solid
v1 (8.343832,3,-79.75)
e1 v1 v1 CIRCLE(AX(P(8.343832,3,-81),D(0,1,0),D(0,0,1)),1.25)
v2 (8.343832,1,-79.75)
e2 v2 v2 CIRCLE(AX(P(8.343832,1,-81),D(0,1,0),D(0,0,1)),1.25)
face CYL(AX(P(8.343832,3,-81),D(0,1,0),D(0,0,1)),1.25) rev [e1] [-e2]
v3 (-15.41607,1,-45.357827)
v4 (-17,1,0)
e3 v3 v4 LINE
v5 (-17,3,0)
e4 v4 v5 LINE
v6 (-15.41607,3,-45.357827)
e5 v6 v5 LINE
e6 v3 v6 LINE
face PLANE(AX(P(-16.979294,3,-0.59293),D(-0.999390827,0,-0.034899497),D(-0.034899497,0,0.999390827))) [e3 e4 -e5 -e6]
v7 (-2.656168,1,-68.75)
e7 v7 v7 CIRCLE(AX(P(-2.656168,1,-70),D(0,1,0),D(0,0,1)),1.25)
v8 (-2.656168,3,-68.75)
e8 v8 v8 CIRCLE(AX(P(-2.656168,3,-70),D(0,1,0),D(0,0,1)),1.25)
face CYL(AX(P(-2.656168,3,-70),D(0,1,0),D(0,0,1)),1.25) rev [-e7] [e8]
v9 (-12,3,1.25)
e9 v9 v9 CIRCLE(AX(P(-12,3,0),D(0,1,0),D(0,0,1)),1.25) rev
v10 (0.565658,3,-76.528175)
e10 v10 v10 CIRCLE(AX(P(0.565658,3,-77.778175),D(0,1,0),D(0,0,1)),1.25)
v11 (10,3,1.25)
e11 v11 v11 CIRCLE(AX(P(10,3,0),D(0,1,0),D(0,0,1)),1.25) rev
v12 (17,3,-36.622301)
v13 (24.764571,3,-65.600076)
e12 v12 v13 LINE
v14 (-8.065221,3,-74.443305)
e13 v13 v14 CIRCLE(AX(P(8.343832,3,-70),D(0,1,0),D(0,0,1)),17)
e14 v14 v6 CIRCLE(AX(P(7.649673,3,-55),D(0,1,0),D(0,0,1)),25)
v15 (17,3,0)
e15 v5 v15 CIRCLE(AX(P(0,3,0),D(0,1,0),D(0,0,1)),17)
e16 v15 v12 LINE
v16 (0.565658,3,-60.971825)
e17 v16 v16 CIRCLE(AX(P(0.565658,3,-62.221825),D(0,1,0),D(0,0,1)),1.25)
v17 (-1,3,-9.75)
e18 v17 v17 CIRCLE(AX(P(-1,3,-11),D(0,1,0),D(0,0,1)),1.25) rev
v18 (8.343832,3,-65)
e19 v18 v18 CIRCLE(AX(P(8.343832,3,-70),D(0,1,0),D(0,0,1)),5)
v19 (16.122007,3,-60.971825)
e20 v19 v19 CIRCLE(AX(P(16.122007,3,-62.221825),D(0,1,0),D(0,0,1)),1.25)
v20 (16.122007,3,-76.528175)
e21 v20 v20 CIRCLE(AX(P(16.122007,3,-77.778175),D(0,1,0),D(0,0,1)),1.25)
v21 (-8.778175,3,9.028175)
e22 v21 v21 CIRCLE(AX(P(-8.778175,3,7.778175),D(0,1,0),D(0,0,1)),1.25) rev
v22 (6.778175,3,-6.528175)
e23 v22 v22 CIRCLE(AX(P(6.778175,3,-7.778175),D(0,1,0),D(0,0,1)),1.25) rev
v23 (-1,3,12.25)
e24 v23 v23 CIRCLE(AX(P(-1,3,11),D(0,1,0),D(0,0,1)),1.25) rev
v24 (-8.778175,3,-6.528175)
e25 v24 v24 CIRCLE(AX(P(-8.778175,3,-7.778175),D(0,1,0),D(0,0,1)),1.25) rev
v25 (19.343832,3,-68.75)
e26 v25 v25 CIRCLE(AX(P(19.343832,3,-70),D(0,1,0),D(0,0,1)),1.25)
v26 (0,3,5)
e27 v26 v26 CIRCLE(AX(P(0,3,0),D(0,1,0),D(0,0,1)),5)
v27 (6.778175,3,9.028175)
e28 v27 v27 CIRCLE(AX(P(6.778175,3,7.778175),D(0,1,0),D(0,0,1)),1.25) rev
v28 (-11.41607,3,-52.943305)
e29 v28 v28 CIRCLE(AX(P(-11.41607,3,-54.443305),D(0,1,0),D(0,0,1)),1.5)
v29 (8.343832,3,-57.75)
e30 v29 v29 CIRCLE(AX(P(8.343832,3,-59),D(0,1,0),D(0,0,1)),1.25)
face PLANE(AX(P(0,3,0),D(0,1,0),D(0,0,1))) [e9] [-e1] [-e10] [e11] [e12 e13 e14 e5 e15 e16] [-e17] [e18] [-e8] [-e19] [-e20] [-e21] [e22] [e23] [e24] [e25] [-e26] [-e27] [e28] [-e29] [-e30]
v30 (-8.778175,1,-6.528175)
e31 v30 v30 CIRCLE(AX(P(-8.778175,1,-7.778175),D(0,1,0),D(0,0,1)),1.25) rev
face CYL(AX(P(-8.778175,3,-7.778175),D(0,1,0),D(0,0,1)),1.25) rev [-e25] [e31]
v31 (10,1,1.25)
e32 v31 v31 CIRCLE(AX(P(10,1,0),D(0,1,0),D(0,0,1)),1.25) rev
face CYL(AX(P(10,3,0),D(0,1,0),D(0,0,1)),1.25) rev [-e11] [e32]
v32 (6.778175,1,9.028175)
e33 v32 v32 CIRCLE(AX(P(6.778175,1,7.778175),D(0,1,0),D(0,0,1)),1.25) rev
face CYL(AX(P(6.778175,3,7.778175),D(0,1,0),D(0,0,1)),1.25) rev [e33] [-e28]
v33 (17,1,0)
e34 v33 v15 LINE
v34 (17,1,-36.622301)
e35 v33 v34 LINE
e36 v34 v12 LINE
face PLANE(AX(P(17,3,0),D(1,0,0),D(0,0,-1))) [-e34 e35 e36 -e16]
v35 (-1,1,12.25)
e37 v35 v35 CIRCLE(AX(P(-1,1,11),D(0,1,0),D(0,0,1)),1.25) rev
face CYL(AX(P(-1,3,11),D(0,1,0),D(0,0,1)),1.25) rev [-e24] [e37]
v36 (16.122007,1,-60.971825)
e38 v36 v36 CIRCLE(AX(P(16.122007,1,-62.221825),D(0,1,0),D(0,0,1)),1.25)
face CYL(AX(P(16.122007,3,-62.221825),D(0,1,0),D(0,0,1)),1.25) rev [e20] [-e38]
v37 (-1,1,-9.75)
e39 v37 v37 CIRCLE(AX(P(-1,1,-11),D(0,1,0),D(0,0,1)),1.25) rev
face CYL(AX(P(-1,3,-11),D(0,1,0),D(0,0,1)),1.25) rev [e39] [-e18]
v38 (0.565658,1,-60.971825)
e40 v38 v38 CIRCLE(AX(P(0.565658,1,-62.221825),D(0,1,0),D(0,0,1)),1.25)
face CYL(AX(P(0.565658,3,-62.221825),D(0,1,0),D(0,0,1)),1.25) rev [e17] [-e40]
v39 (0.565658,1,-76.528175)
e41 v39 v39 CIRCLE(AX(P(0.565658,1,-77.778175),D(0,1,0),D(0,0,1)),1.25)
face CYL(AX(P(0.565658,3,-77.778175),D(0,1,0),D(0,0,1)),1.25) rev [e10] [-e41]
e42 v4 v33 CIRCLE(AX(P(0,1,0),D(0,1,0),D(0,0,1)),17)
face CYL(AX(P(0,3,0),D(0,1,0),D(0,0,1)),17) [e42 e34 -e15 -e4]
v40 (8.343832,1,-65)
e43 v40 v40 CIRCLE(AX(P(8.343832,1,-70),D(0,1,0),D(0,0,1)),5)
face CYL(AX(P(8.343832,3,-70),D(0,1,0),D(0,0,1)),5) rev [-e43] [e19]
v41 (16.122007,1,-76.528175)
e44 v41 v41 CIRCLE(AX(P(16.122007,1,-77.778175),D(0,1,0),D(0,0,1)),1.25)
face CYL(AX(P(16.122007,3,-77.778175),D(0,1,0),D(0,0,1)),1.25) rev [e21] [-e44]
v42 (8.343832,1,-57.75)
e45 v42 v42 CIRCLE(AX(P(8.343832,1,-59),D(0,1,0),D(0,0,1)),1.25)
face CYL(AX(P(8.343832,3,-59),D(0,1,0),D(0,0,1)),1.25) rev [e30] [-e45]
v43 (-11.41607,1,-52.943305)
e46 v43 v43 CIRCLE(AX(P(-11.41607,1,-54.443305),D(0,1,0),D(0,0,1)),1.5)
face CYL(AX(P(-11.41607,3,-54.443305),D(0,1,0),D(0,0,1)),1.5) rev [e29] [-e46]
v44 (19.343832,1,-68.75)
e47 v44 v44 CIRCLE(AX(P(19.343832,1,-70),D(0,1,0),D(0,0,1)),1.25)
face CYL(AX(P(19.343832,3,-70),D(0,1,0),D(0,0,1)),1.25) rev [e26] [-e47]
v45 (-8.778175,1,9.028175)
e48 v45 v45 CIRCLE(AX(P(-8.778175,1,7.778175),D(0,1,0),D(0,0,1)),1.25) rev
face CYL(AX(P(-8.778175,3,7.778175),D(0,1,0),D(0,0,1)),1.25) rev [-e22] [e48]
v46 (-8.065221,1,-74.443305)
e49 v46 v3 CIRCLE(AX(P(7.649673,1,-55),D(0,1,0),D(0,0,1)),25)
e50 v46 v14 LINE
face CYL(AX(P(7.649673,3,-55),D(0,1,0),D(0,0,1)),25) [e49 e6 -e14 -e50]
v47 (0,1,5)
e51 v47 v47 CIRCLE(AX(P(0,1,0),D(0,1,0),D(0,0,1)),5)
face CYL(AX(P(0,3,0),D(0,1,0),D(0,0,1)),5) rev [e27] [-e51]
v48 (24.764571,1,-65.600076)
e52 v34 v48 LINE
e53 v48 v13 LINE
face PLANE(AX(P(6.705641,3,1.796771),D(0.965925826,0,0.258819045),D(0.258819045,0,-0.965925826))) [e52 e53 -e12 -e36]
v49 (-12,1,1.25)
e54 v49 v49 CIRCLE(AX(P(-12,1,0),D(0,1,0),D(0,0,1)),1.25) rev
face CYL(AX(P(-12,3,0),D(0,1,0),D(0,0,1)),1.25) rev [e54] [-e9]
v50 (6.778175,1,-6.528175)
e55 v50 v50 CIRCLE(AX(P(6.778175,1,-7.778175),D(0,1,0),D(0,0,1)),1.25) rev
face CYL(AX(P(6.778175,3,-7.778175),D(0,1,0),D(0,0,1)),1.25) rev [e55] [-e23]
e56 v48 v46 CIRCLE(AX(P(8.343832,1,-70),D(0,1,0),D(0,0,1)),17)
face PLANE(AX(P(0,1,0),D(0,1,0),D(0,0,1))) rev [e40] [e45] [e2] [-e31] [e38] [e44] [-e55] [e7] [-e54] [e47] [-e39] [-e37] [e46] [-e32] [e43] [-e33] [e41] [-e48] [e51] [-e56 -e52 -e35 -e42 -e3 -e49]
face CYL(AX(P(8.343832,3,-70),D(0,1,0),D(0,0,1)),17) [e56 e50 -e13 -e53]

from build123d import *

# Parameters (mm, degrees)
RESSALTO_EXTRUS_O1_DEPTH      = 3
CORTE_EXTRUS_O8_REACH         = 92.666
ESBO_O7_R                     = 1.25
CORTE_EXTRUS_O9_REACH         = 92.666
ESBO_O8_R                     = 5
ESBO_O8_R_2                   = 1.5
CORTE_EXTRUS_O11_REACH        = 92.666
ESBO_O9_R                     = 1.25
CORTE_EXTRUS_O12_REACH        = 92.666
ESBO_O11_R                    = 5
CONVERTER_S_LIDO1_OUTLINE_R   = 1.25
CONVERTER_S_LIDO1_OUTLINE_R_2 = 5
CONVERTER_S_LIDO1_OUTLINE_R_3 = 1.5
CONVERTER_S_LIDO1_DEPTH       = 1


# Read off the part's stored shape, not the designer's step: Converter-Sólido1
with BuildPart() as part:
    # Esboço1 → Ressalto-extrusão1 (new body)
    with BuildSketch(Plane(origin=(0, 0, 0), x_dir=(1, 0, 0), z_dir=(0, 1, 0))):
        with BuildLine():
            Line((17, 36.622301445), (24.764571353, 65.600076233))
            ThreePointArc((24.764571353, 65.600076233), (12.765450327, 86.414910724), (-8.065221434, 74.443304555))
            ThreePointArc((-8.065221434, 74.443304555), (-16.588225274, 61.125706966), (-15.416069793, 45.357826591))
            Line((-15.416069793, 45.357826591), (-17, 0))
            ThreePointArc((-17, 0), (0, -17), (17, 0))
            Line((17, 0), (17, 36.622301445))
        make_face()
    extrude(amount=RESSALTO_EXTRUS_O1_DEPTH)

    # Esboço7 → Corte-extrusão8 (cut, up to next)
    with BuildSketch(Plane.XZ, mode=Mode.PRIVATE) as corte_extrus_o8_sk1:
        with Locations(Location((-1, -11, 0), (0, 0, 270))):
            Circle(ESBO_O7_R)
    corte_extrus_o8_tool1 = extrude(corte_extrus_o8_sk1.sketch, amount=-CORTE_EXTRUS_O8_REACH, mode=Mode.PRIVATE) & part.part
    # Esboço7 → Corte-extrusão8 (cut, up to next)
    with BuildSketch(Plane.XZ, mode=Mode.PRIVATE) as corte_extrus_o8_sk2:
        with Locations(Location((-8.778174593, -7.778174593, 0), (0, 0, 270))):
            Circle(ESBO_O7_R)
    corte_extrus_o8_tool2 = extrude(corte_extrus_o8_sk2.sketch, amount=-CORTE_EXTRUS_O8_REACH, mode=Mode.PRIVATE) & part.part
    # Esboço7 → Corte-extrusão8 (cut, up to next)
    with BuildSketch(Plane.XZ, mode=Mode.PRIVATE) as corte_extrus_o8_sk3:
        with Locations(Location((-12, 0, 0), (0, 0, 270))):
            Circle(ESBO_O7_R)
    corte_extrus_o8_tool3 = extrude(corte_extrus_o8_sk3.sketch, amount=-CORTE_EXTRUS_O8_REACH, mode=Mode.PRIVATE) & part.part
    # Esboço7 → Corte-extrusão8 (cut, up to next)
    with BuildSketch(Plane.XZ, mode=Mode.PRIVATE) as corte_extrus_o8_sk4:
        with Locations(Location((-8.778174593, 7.778174593, 0), (0, 0, 270))):
            Circle(ESBO_O7_R)
    corte_extrus_o8_tool4 = extrude(corte_extrus_o8_sk4.sketch, amount=-CORTE_EXTRUS_O8_REACH, mode=Mode.PRIVATE) & part.part
    # Esboço7 → Corte-extrusão8 (cut, up to next)
    with BuildSketch(Plane.XZ, mode=Mode.PRIVATE) as corte_extrus_o8_sk5:
        with Locations(Location((-1, 11, 0), (0, 0, 270))):
            Circle(ESBO_O7_R)
    corte_extrus_o8_tool5 = extrude(corte_extrus_o8_sk5.sketch, amount=-CORTE_EXTRUS_O8_REACH, mode=Mode.PRIVATE) & part.part
    # Esboço7 → Corte-extrusão8 (cut, up to next)
    with BuildSketch(Plane.XZ, mode=Mode.PRIVATE) as corte_extrus_o8_sk6:
        with Locations(Location((6.778174593, 7.778174593, 0), (0, 0, 270))):
            Circle(ESBO_O7_R)
    corte_extrus_o8_tool6 = extrude(corte_extrus_o8_sk6.sketch, amount=-CORTE_EXTRUS_O8_REACH, mode=Mode.PRIVATE) & part.part
    # Esboço7 → Corte-extrusão8 (cut, up to next)
    with BuildSketch(Plane.XZ, mode=Mode.PRIVATE) as corte_extrus_o8_sk7:
        with Locations(Location((10, 0, 0), (0, 0, 270))):
            Circle(ESBO_O7_R)
    corte_extrus_o8_tool7 = extrude(corte_extrus_o8_sk7.sketch, amount=-CORTE_EXTRUS_O8_REACH, mode=Mode.PRIVATE) & part.part
    # Esboço7 → Corte-extrusão8 (cut, up to next)
    with BuildSketch(Plane.XZ, mode=Mode.PRIVATE) as corte_extrus_o8_sk8:
        with Locations(Location((6.778174593, -7.778174593, 0), (0, 0, 270))):
            Circle(ESBO_O7_R)
    corte_extrus_o8_tool8 = extrude(corte_extrus_o8_sk8.sketch, amount=-CORTE_EXTRUS_O8_REACH, mode=Mode.PRIVATE) & part.part
    add(corte_extrus_o8_tool1.solids().sort_by_distance((-1, 0, -11))[0], mode=Mode.SUBTRACT)
    add(corte_extrus_o8_tool2.solids().sort_by_distance((-8.778175, 0, -7.778175))[0], mode=Mode.SUBTRACT)
    add(corte_extrus_o8_tool3.solids().sort_by_distance((-12, 0, 0))[0], mode=Mode.SUBTRACT)
    add(corte_extrus_o8_tool4.solids().sort_by_distance((-8.778175, 0, 7.778175))[0], mode=Mode.SUBTRACT)
    add(corte_extrus_o8_tool5.solids().sort_by_distance((-1, 0, 11))[0], mode=Mode.SUBTRACT)
    add(corte_extrus_o8_tool6.solids().sort_by_distance((6.778175, 0, 7.778175))[0], mode=Mode.SUBTRACT)
    add(corte_extrus_o8_tool7.solids().sort_by_distance((10, 0, 0))[0], mode=Mode.SUBTRACT)
    add(corte_extrus_o8_tool8.solids().sort_by_distance((6.778175, 0, -7.778175))[0], mode=Mode.SUBTRACT)

    # Esboço8 → Corte-extrusão9 (cut, up to next)
    with BuildSketch(Plane(origin=(0, 3, 0), x_dir=(1, 0, 0), z_dir=(0, 1, 0)), mode=Mode.PRIVATE) as corte_extrus_o9_sk1:
        with Locations(Location((0, 0, 0), (0, 0, 270))):
            Circle(ESBO_O8_R)
    corte_extrus_o9_tool1 = extrude(corte_extrus_o9_sk1.sketch, amount=-CORTE_EXTRUS_O9_REACH, mode=Mode.PRIVATE) & part.part
    # Esboço8 → Corte-extrusão9 (cut, up to next)
    with BuildSketch(Plane(origin=(0, 3, 0), x_dir=(1, 0, 0), z_dir=(0, 1, 0)), mode=Mode.PRIVATE) as corte_extrus_o9_sk2:
        with Locations(Location((-11.416069793, 54.443304555, 0), (0, 0, 270))):
            Circle(ESBO_O8_R_2)
    corte_extrus_o9_tool2 = extrude(corte_extrus_o9_sk2.sketch, amount=-CORTE_EXTRUS_O9_REACH, mode=Mode.PRIVATE) & part.part
    add(corte_extrus_o9_tool1.solids().sort_by_distance((0, 3, 0))[0], mode=Mode.SUBTRACT)
    add(corte_extrus_o9_tool2.solids().sort_by_distance((-11.41607, 3, -54.443305))[0], mode=Mode.SUBTRACT)

    # Esboço9 → Corte-extrusão11 (cut, up to next)
    with BuildSketch(Plane(origin=(0, 3, 0), x_dir=(1, 0, 0), z_dir=(0, 1, 0)), mode=Mode.PRIVATE) as corte_extrus_o11_sk1:
        with Locations(Location((8.343832306, 81, 0), (0, 0, 270))):
            Circle(ESBO_O9_R)
    corte_extrus_o11_tool1 = extrude(corte_extrus_o11_sk1.sketch, amount=-CORTE_EXTRUS_O11_REACH, mode=Mode.PRIVATE) & part.part
    # Esboço9 → Corte-extrusão11 (cut, up to next)
    with BuildSketch(Plane(origin=(0, 3, 0), x_dir=(1, 0, 0), z_dir=(0, 1, 0)), mode=Mode.PRIVATE) as corte_extrus_o11_sk2:
        with Locations(Location((16.122006899, 77.778174593, 0), (0, 0, 270))):
            Circle(ESBO_O9_R)
    corte_extrus_o11_tool2 = extrude(corte_extrus_o11_sk2.sketch, amount=-CORTE_EXTRUS_O11_REACH, mode=Mode.PRIVATE) & part.part
    # Esboço9 → Corte-extrusão11 (cut, up to next)
    with BuildSketch(Plane(origin=(0, 3, 0), x_dir=(1, 0, 0), z_dir=(0, 1, 0)), mode=Mode.PRIVATE) as corte_extrus_o11_sk3:
        with Locations(Location((19.343832306, 70, 0), (0, 0, 270))):
            Circle(ESBO_O9_R)
    corte_extrus_o11_tool3 = extrude(corte_extrus_o11_sk3.sketch, amount=-CORTE_EXTRUS_O11_REACH, mode=Mode.PRIVATE) & part.part
    # Esboço9 → Corte-extrusão11 (cut, up to next)
    with BuildSketch(Plane(origin=(0, 3, 0), x_dir=(1, 0, 0), z_dir=(0, 1, 0)), mode=Mode.PRIVATE) as corte_extrus_o11_sk4:
        with Locations(Location((16.122006899, 62.221825407, 0), (0, 0, 270))):
            Circle(ESBO_O9_R)
    corte_extrus_o11_tool4 = extrude(corte_extrus_o11_sk4.sketch, amount=-CORTE_EXTRUS_O11_REACH, mode=Mode.PRIVATE) & part.part
    # Esboço9 → Corte-extrusão11 (cut, up to next)
    with BuildSketch(Plane(origin=(0, 3, 0), x_dir=(1, 0, 0), z_dir=(0, 1, 0)), mode=Mode.PRIVATE) as corte_extrus_o11_sk5:
        with Locations(Location((8.343832306, 59, 0), (0, 0, 270))):
            Circle(ESBO_O9_R)
    corte_extrus_o11_tool5 = extrude(corte_extrus_o11_sk5.sketch, amount=-CORTE_EXTRUS_O11_REACH, mode=Mode.PRIVATE) & part.part
    # Esboço9 → Corte-extrusão11 (cut, up to next)
    with BuildSketch(Plane(origin=(0, 3, 0), x_dir=(1, 0, 0), z_dir=(0, 1, 0)), mode=Mode.PRIVATE) as corte_extrus_o11_sk6:
        with Locations(Location((0.565657713, 62.221825407, 0), (0, 0, 270))):
            Circle(ESBO_O9_R)
    corte_extrus_o11_tool6 = extrude(corte_extrus_o11_sk6.sketch, amount=-CORTE_EXTRUS_O11_REACH, mode=Mode.PRIVATE) & part.part
    # Esboço9 → Corte-extrusão11 (cut, up to next)
    with BuildSketch(Plane(origin=(0, 3, 0), x_dir=(1, 0, 0), z_dir=(0, 1, 0)), mode=Mode.PRIVATE) as corte_extrus_o11_sk7:
        with Locations(Location((-2.656167694, 70, 0), (0, 0, 270))):
            Circle(ESBO_O9_R)
    corte_extrus_o11_tool7 = extrude(corte_extrus_o11_sk7.sketch, amount=-CORTE_EXTRUS_O11_REACH, mode=Mode.PRIVATE) & part.part
    # Esboço9 → Corte-extrusão11 (cut, up to next)
    with BuildSketch(Plane(origin=(0, 3, 0), x_dir=(1, 0, 0), z_dir=(0, 1, 0)), mode=Mode.PRIVATE) as corte_extrus_o11_sk8:
        with Locations(Location((0.565657713, 77.778174593, 0), (0, 0, 270))):
            Circle(ESBO_O9_R)
    corte_extrus_o11_tool8 = extrude(corte_extrus_o11_sk8.sketch, amount=-CORTE_EXTRUS_O11_REACH, mode=Mode.PRIVATE) & part.part
    add(corte_extrus_o11_tool1.solids().sort_by_distance((8.343832, 3, -81))[0], mode=Mode.SUBTRACT)
    add(corte_extrus_o11_tool2.solids().sort_by_distance((16.122007, 3, -77.778175))[0], mode=Mode.SUBTRACT)
    add(corte_extrus_o11_tool3.solids().sort_by_distance((19.343832, 3, -70))[0], mode=Mode.SUBTRACT)
    add(corte_extrus_o11_tool4.solids().sort_by_distance((16.122007, 3, -62.221825))[0], mode=Mode.SUBTRACT)
    add(corte_extrus_o11_tool5.solids().sort_by_distance((8.343832, 3, -59))[0], mode=Mode.SUBTRACT)
    add(corte_extrus_o11_tool6.solids().sort_by_distance((0.565658, 3, -62.221825))[0], mode=Mode.SUBTRACT)
    add(corte_extrus_o11_tool7.solids().sort_by_distance((-2.656168, 3, -70))[0], mode=Mode.SUBTRACT)
    add(corte_extrus_o11_tool8.solids().sort_by_distance((0.565658, 3, -77.778175))[0], mode=Mode.SUBTRACT)

    # Esboço11 → Corte-extrusão12 (cut, up to next)
    with BuildSketch(Plane(origin=(0, 3, 0), x_dir=(1, 0, 0), z_dir=(0, 1, 0)), mode=Mode.PRIVATE) as corte_extrus_o12_sk1:
        with Locations(Location((8.343832306, 70, 0), (0, 0, 270))):
            Circle(ESBO_O11_R)
    corte_extrus_o12_tool1 = extrude(corte_extrus_o12_sk1.sketch, amount=-CORTE_EXTRUS_O12_REACH, mode=Mode.PRIVATE) & part.part
    add(corte_extrus_o12_tool1.solids().sort_by_distance((8.343832, 3, -70))[0], mode=Mode.SUBTRACT)

    # Converter-Sólido1 outline → Converter-Sólido1 (cut)
    with BuildSketch(Plane(origin=(0, 0, 0), x_dir=(1, 0, 0), z_dir=(0, 1, 0))):
        with BuildLine():
            ThreePointArc((24.764571353, 65.600076233), (12.765450327, 86.414910724), (-8.065221434, 74.443304555))
            ThreePointArc((-8.065221434, 74.443304555), (-16.588225274, 61.125706966), (-15.416069793, 45.357826591))
            Line((-15.416069793, 45.357826591), (-17, 0))
            ThreePointArc((-17, 0), (0, -17), (17, 0))
            Line((17, 0), (17, 36.622301445))
            Line((17, 36.622301445), (24.764571353, 65.600076233))
        make_face()
        with Locations((-8.778174593, -7.778174593)):
            Circle(CONVERTER_S_LIDO1_OUTLINE_R, mode=Mode.SUBTRACT)
        with Locations((-12, 0)):
            Circle(CONVERTER_S_LIDO1_OUTLINE_R, mode=Mode.SUBTRACT)
        with Locations((-8.778174593, 7.778174593)):
            Circle(CONVERTER_S_LIDO1_OUTLINE_R, mode=Mode.SUBTRACT)
        with Locations((-1, -11)):
            Circle(CONVERTER_S_LIDO1_OUTLINE_R, mode=Mode.SUBTRACT)
        Circle(CONVERTER_S_LIDO1_OUTLINE_R_2, mode=Mode.SUBTRACT)
        with Locations((-1, 11)):
            Circle(CONVERTER_S_LIDO1_OUTLINE_R, mode=Mode.SUBTRACT)
        with Locations((6.778174593, -7.778174593)):
            Circle(CONVERTER_S_LIDO1_OUTLINE_R, mode=Mode.SUBTRACT)
        with Locations((6.778174593, 7.778174593)):
            Circle(CONVERTER_S_LIDO1_OUTLINE_R, mode=Mode.SUBTRACT)
        with Locations((10, 0)):
            Circle(CONVERTER_S_LIDO1_OUTLINE_R, mode=Mode.SUBTRACT)
        with Locations((-11.416069793, 54.443304555)):
            Circle(CONVERTER_S_LIDO1_OUTLINE_R_3, mode=Mode.SUBTRACT)
        with Locations((-2.656167694, 70)):
            Circle(CONVERTER_S_LIDO1_OUTLINE_R, mode=Mode.SUBTRACT)
        with Locations((0.565657713, 62.221825407)):
            Circle(CONVERTER_S_LIDO1_OUTLINE_R, mode=Mode.SUBTRACT)
        with Locations((0.565657713, 77.778174593)):
            Circle(CONVERTER_S_LIDO1_OUTLINE_R, mode=Mode.SUBTRACT)
        with Locations((8.343832306, 59)):
            Circle(CONVERTER_S_LIDO1_OUTLINE_R, mode=Mode.SUBTRACT)
        with Locations((8.343832306, 70)):
            Circle(CONVERTER_S_LIDO1_OUTLINE_R_2, mode=Mode.SUBTRACT)
        with Locations((8.343832306, 81)):
            Circle(CONVERTER_S_LIDO1_OUTLINE_R, mode=Mode.SUBTRACT)
        with Locations((16.122006899, 62.221825407)):
            Circle(CONVERTER_S_LIDO1_OUTLINE_R, mode=Mode.SUBTRACT)
        with Locations((19.343832306, 70)):
            Circle(CONVERTER_S_LIDO1_OUTLINE_R, mode=Mode.SUBTRACT)
        with Locations((16.122006899, 77.778174593)):
            Circle(CONVERTER_S_LIDO1_OUTLINE_R, mode=Mode.SUBTRACT)
    extrude(amount=CONVERTER_S_LIDO1_DEPTH, mode=Mode.SUBTRACT)


solid = part.part
